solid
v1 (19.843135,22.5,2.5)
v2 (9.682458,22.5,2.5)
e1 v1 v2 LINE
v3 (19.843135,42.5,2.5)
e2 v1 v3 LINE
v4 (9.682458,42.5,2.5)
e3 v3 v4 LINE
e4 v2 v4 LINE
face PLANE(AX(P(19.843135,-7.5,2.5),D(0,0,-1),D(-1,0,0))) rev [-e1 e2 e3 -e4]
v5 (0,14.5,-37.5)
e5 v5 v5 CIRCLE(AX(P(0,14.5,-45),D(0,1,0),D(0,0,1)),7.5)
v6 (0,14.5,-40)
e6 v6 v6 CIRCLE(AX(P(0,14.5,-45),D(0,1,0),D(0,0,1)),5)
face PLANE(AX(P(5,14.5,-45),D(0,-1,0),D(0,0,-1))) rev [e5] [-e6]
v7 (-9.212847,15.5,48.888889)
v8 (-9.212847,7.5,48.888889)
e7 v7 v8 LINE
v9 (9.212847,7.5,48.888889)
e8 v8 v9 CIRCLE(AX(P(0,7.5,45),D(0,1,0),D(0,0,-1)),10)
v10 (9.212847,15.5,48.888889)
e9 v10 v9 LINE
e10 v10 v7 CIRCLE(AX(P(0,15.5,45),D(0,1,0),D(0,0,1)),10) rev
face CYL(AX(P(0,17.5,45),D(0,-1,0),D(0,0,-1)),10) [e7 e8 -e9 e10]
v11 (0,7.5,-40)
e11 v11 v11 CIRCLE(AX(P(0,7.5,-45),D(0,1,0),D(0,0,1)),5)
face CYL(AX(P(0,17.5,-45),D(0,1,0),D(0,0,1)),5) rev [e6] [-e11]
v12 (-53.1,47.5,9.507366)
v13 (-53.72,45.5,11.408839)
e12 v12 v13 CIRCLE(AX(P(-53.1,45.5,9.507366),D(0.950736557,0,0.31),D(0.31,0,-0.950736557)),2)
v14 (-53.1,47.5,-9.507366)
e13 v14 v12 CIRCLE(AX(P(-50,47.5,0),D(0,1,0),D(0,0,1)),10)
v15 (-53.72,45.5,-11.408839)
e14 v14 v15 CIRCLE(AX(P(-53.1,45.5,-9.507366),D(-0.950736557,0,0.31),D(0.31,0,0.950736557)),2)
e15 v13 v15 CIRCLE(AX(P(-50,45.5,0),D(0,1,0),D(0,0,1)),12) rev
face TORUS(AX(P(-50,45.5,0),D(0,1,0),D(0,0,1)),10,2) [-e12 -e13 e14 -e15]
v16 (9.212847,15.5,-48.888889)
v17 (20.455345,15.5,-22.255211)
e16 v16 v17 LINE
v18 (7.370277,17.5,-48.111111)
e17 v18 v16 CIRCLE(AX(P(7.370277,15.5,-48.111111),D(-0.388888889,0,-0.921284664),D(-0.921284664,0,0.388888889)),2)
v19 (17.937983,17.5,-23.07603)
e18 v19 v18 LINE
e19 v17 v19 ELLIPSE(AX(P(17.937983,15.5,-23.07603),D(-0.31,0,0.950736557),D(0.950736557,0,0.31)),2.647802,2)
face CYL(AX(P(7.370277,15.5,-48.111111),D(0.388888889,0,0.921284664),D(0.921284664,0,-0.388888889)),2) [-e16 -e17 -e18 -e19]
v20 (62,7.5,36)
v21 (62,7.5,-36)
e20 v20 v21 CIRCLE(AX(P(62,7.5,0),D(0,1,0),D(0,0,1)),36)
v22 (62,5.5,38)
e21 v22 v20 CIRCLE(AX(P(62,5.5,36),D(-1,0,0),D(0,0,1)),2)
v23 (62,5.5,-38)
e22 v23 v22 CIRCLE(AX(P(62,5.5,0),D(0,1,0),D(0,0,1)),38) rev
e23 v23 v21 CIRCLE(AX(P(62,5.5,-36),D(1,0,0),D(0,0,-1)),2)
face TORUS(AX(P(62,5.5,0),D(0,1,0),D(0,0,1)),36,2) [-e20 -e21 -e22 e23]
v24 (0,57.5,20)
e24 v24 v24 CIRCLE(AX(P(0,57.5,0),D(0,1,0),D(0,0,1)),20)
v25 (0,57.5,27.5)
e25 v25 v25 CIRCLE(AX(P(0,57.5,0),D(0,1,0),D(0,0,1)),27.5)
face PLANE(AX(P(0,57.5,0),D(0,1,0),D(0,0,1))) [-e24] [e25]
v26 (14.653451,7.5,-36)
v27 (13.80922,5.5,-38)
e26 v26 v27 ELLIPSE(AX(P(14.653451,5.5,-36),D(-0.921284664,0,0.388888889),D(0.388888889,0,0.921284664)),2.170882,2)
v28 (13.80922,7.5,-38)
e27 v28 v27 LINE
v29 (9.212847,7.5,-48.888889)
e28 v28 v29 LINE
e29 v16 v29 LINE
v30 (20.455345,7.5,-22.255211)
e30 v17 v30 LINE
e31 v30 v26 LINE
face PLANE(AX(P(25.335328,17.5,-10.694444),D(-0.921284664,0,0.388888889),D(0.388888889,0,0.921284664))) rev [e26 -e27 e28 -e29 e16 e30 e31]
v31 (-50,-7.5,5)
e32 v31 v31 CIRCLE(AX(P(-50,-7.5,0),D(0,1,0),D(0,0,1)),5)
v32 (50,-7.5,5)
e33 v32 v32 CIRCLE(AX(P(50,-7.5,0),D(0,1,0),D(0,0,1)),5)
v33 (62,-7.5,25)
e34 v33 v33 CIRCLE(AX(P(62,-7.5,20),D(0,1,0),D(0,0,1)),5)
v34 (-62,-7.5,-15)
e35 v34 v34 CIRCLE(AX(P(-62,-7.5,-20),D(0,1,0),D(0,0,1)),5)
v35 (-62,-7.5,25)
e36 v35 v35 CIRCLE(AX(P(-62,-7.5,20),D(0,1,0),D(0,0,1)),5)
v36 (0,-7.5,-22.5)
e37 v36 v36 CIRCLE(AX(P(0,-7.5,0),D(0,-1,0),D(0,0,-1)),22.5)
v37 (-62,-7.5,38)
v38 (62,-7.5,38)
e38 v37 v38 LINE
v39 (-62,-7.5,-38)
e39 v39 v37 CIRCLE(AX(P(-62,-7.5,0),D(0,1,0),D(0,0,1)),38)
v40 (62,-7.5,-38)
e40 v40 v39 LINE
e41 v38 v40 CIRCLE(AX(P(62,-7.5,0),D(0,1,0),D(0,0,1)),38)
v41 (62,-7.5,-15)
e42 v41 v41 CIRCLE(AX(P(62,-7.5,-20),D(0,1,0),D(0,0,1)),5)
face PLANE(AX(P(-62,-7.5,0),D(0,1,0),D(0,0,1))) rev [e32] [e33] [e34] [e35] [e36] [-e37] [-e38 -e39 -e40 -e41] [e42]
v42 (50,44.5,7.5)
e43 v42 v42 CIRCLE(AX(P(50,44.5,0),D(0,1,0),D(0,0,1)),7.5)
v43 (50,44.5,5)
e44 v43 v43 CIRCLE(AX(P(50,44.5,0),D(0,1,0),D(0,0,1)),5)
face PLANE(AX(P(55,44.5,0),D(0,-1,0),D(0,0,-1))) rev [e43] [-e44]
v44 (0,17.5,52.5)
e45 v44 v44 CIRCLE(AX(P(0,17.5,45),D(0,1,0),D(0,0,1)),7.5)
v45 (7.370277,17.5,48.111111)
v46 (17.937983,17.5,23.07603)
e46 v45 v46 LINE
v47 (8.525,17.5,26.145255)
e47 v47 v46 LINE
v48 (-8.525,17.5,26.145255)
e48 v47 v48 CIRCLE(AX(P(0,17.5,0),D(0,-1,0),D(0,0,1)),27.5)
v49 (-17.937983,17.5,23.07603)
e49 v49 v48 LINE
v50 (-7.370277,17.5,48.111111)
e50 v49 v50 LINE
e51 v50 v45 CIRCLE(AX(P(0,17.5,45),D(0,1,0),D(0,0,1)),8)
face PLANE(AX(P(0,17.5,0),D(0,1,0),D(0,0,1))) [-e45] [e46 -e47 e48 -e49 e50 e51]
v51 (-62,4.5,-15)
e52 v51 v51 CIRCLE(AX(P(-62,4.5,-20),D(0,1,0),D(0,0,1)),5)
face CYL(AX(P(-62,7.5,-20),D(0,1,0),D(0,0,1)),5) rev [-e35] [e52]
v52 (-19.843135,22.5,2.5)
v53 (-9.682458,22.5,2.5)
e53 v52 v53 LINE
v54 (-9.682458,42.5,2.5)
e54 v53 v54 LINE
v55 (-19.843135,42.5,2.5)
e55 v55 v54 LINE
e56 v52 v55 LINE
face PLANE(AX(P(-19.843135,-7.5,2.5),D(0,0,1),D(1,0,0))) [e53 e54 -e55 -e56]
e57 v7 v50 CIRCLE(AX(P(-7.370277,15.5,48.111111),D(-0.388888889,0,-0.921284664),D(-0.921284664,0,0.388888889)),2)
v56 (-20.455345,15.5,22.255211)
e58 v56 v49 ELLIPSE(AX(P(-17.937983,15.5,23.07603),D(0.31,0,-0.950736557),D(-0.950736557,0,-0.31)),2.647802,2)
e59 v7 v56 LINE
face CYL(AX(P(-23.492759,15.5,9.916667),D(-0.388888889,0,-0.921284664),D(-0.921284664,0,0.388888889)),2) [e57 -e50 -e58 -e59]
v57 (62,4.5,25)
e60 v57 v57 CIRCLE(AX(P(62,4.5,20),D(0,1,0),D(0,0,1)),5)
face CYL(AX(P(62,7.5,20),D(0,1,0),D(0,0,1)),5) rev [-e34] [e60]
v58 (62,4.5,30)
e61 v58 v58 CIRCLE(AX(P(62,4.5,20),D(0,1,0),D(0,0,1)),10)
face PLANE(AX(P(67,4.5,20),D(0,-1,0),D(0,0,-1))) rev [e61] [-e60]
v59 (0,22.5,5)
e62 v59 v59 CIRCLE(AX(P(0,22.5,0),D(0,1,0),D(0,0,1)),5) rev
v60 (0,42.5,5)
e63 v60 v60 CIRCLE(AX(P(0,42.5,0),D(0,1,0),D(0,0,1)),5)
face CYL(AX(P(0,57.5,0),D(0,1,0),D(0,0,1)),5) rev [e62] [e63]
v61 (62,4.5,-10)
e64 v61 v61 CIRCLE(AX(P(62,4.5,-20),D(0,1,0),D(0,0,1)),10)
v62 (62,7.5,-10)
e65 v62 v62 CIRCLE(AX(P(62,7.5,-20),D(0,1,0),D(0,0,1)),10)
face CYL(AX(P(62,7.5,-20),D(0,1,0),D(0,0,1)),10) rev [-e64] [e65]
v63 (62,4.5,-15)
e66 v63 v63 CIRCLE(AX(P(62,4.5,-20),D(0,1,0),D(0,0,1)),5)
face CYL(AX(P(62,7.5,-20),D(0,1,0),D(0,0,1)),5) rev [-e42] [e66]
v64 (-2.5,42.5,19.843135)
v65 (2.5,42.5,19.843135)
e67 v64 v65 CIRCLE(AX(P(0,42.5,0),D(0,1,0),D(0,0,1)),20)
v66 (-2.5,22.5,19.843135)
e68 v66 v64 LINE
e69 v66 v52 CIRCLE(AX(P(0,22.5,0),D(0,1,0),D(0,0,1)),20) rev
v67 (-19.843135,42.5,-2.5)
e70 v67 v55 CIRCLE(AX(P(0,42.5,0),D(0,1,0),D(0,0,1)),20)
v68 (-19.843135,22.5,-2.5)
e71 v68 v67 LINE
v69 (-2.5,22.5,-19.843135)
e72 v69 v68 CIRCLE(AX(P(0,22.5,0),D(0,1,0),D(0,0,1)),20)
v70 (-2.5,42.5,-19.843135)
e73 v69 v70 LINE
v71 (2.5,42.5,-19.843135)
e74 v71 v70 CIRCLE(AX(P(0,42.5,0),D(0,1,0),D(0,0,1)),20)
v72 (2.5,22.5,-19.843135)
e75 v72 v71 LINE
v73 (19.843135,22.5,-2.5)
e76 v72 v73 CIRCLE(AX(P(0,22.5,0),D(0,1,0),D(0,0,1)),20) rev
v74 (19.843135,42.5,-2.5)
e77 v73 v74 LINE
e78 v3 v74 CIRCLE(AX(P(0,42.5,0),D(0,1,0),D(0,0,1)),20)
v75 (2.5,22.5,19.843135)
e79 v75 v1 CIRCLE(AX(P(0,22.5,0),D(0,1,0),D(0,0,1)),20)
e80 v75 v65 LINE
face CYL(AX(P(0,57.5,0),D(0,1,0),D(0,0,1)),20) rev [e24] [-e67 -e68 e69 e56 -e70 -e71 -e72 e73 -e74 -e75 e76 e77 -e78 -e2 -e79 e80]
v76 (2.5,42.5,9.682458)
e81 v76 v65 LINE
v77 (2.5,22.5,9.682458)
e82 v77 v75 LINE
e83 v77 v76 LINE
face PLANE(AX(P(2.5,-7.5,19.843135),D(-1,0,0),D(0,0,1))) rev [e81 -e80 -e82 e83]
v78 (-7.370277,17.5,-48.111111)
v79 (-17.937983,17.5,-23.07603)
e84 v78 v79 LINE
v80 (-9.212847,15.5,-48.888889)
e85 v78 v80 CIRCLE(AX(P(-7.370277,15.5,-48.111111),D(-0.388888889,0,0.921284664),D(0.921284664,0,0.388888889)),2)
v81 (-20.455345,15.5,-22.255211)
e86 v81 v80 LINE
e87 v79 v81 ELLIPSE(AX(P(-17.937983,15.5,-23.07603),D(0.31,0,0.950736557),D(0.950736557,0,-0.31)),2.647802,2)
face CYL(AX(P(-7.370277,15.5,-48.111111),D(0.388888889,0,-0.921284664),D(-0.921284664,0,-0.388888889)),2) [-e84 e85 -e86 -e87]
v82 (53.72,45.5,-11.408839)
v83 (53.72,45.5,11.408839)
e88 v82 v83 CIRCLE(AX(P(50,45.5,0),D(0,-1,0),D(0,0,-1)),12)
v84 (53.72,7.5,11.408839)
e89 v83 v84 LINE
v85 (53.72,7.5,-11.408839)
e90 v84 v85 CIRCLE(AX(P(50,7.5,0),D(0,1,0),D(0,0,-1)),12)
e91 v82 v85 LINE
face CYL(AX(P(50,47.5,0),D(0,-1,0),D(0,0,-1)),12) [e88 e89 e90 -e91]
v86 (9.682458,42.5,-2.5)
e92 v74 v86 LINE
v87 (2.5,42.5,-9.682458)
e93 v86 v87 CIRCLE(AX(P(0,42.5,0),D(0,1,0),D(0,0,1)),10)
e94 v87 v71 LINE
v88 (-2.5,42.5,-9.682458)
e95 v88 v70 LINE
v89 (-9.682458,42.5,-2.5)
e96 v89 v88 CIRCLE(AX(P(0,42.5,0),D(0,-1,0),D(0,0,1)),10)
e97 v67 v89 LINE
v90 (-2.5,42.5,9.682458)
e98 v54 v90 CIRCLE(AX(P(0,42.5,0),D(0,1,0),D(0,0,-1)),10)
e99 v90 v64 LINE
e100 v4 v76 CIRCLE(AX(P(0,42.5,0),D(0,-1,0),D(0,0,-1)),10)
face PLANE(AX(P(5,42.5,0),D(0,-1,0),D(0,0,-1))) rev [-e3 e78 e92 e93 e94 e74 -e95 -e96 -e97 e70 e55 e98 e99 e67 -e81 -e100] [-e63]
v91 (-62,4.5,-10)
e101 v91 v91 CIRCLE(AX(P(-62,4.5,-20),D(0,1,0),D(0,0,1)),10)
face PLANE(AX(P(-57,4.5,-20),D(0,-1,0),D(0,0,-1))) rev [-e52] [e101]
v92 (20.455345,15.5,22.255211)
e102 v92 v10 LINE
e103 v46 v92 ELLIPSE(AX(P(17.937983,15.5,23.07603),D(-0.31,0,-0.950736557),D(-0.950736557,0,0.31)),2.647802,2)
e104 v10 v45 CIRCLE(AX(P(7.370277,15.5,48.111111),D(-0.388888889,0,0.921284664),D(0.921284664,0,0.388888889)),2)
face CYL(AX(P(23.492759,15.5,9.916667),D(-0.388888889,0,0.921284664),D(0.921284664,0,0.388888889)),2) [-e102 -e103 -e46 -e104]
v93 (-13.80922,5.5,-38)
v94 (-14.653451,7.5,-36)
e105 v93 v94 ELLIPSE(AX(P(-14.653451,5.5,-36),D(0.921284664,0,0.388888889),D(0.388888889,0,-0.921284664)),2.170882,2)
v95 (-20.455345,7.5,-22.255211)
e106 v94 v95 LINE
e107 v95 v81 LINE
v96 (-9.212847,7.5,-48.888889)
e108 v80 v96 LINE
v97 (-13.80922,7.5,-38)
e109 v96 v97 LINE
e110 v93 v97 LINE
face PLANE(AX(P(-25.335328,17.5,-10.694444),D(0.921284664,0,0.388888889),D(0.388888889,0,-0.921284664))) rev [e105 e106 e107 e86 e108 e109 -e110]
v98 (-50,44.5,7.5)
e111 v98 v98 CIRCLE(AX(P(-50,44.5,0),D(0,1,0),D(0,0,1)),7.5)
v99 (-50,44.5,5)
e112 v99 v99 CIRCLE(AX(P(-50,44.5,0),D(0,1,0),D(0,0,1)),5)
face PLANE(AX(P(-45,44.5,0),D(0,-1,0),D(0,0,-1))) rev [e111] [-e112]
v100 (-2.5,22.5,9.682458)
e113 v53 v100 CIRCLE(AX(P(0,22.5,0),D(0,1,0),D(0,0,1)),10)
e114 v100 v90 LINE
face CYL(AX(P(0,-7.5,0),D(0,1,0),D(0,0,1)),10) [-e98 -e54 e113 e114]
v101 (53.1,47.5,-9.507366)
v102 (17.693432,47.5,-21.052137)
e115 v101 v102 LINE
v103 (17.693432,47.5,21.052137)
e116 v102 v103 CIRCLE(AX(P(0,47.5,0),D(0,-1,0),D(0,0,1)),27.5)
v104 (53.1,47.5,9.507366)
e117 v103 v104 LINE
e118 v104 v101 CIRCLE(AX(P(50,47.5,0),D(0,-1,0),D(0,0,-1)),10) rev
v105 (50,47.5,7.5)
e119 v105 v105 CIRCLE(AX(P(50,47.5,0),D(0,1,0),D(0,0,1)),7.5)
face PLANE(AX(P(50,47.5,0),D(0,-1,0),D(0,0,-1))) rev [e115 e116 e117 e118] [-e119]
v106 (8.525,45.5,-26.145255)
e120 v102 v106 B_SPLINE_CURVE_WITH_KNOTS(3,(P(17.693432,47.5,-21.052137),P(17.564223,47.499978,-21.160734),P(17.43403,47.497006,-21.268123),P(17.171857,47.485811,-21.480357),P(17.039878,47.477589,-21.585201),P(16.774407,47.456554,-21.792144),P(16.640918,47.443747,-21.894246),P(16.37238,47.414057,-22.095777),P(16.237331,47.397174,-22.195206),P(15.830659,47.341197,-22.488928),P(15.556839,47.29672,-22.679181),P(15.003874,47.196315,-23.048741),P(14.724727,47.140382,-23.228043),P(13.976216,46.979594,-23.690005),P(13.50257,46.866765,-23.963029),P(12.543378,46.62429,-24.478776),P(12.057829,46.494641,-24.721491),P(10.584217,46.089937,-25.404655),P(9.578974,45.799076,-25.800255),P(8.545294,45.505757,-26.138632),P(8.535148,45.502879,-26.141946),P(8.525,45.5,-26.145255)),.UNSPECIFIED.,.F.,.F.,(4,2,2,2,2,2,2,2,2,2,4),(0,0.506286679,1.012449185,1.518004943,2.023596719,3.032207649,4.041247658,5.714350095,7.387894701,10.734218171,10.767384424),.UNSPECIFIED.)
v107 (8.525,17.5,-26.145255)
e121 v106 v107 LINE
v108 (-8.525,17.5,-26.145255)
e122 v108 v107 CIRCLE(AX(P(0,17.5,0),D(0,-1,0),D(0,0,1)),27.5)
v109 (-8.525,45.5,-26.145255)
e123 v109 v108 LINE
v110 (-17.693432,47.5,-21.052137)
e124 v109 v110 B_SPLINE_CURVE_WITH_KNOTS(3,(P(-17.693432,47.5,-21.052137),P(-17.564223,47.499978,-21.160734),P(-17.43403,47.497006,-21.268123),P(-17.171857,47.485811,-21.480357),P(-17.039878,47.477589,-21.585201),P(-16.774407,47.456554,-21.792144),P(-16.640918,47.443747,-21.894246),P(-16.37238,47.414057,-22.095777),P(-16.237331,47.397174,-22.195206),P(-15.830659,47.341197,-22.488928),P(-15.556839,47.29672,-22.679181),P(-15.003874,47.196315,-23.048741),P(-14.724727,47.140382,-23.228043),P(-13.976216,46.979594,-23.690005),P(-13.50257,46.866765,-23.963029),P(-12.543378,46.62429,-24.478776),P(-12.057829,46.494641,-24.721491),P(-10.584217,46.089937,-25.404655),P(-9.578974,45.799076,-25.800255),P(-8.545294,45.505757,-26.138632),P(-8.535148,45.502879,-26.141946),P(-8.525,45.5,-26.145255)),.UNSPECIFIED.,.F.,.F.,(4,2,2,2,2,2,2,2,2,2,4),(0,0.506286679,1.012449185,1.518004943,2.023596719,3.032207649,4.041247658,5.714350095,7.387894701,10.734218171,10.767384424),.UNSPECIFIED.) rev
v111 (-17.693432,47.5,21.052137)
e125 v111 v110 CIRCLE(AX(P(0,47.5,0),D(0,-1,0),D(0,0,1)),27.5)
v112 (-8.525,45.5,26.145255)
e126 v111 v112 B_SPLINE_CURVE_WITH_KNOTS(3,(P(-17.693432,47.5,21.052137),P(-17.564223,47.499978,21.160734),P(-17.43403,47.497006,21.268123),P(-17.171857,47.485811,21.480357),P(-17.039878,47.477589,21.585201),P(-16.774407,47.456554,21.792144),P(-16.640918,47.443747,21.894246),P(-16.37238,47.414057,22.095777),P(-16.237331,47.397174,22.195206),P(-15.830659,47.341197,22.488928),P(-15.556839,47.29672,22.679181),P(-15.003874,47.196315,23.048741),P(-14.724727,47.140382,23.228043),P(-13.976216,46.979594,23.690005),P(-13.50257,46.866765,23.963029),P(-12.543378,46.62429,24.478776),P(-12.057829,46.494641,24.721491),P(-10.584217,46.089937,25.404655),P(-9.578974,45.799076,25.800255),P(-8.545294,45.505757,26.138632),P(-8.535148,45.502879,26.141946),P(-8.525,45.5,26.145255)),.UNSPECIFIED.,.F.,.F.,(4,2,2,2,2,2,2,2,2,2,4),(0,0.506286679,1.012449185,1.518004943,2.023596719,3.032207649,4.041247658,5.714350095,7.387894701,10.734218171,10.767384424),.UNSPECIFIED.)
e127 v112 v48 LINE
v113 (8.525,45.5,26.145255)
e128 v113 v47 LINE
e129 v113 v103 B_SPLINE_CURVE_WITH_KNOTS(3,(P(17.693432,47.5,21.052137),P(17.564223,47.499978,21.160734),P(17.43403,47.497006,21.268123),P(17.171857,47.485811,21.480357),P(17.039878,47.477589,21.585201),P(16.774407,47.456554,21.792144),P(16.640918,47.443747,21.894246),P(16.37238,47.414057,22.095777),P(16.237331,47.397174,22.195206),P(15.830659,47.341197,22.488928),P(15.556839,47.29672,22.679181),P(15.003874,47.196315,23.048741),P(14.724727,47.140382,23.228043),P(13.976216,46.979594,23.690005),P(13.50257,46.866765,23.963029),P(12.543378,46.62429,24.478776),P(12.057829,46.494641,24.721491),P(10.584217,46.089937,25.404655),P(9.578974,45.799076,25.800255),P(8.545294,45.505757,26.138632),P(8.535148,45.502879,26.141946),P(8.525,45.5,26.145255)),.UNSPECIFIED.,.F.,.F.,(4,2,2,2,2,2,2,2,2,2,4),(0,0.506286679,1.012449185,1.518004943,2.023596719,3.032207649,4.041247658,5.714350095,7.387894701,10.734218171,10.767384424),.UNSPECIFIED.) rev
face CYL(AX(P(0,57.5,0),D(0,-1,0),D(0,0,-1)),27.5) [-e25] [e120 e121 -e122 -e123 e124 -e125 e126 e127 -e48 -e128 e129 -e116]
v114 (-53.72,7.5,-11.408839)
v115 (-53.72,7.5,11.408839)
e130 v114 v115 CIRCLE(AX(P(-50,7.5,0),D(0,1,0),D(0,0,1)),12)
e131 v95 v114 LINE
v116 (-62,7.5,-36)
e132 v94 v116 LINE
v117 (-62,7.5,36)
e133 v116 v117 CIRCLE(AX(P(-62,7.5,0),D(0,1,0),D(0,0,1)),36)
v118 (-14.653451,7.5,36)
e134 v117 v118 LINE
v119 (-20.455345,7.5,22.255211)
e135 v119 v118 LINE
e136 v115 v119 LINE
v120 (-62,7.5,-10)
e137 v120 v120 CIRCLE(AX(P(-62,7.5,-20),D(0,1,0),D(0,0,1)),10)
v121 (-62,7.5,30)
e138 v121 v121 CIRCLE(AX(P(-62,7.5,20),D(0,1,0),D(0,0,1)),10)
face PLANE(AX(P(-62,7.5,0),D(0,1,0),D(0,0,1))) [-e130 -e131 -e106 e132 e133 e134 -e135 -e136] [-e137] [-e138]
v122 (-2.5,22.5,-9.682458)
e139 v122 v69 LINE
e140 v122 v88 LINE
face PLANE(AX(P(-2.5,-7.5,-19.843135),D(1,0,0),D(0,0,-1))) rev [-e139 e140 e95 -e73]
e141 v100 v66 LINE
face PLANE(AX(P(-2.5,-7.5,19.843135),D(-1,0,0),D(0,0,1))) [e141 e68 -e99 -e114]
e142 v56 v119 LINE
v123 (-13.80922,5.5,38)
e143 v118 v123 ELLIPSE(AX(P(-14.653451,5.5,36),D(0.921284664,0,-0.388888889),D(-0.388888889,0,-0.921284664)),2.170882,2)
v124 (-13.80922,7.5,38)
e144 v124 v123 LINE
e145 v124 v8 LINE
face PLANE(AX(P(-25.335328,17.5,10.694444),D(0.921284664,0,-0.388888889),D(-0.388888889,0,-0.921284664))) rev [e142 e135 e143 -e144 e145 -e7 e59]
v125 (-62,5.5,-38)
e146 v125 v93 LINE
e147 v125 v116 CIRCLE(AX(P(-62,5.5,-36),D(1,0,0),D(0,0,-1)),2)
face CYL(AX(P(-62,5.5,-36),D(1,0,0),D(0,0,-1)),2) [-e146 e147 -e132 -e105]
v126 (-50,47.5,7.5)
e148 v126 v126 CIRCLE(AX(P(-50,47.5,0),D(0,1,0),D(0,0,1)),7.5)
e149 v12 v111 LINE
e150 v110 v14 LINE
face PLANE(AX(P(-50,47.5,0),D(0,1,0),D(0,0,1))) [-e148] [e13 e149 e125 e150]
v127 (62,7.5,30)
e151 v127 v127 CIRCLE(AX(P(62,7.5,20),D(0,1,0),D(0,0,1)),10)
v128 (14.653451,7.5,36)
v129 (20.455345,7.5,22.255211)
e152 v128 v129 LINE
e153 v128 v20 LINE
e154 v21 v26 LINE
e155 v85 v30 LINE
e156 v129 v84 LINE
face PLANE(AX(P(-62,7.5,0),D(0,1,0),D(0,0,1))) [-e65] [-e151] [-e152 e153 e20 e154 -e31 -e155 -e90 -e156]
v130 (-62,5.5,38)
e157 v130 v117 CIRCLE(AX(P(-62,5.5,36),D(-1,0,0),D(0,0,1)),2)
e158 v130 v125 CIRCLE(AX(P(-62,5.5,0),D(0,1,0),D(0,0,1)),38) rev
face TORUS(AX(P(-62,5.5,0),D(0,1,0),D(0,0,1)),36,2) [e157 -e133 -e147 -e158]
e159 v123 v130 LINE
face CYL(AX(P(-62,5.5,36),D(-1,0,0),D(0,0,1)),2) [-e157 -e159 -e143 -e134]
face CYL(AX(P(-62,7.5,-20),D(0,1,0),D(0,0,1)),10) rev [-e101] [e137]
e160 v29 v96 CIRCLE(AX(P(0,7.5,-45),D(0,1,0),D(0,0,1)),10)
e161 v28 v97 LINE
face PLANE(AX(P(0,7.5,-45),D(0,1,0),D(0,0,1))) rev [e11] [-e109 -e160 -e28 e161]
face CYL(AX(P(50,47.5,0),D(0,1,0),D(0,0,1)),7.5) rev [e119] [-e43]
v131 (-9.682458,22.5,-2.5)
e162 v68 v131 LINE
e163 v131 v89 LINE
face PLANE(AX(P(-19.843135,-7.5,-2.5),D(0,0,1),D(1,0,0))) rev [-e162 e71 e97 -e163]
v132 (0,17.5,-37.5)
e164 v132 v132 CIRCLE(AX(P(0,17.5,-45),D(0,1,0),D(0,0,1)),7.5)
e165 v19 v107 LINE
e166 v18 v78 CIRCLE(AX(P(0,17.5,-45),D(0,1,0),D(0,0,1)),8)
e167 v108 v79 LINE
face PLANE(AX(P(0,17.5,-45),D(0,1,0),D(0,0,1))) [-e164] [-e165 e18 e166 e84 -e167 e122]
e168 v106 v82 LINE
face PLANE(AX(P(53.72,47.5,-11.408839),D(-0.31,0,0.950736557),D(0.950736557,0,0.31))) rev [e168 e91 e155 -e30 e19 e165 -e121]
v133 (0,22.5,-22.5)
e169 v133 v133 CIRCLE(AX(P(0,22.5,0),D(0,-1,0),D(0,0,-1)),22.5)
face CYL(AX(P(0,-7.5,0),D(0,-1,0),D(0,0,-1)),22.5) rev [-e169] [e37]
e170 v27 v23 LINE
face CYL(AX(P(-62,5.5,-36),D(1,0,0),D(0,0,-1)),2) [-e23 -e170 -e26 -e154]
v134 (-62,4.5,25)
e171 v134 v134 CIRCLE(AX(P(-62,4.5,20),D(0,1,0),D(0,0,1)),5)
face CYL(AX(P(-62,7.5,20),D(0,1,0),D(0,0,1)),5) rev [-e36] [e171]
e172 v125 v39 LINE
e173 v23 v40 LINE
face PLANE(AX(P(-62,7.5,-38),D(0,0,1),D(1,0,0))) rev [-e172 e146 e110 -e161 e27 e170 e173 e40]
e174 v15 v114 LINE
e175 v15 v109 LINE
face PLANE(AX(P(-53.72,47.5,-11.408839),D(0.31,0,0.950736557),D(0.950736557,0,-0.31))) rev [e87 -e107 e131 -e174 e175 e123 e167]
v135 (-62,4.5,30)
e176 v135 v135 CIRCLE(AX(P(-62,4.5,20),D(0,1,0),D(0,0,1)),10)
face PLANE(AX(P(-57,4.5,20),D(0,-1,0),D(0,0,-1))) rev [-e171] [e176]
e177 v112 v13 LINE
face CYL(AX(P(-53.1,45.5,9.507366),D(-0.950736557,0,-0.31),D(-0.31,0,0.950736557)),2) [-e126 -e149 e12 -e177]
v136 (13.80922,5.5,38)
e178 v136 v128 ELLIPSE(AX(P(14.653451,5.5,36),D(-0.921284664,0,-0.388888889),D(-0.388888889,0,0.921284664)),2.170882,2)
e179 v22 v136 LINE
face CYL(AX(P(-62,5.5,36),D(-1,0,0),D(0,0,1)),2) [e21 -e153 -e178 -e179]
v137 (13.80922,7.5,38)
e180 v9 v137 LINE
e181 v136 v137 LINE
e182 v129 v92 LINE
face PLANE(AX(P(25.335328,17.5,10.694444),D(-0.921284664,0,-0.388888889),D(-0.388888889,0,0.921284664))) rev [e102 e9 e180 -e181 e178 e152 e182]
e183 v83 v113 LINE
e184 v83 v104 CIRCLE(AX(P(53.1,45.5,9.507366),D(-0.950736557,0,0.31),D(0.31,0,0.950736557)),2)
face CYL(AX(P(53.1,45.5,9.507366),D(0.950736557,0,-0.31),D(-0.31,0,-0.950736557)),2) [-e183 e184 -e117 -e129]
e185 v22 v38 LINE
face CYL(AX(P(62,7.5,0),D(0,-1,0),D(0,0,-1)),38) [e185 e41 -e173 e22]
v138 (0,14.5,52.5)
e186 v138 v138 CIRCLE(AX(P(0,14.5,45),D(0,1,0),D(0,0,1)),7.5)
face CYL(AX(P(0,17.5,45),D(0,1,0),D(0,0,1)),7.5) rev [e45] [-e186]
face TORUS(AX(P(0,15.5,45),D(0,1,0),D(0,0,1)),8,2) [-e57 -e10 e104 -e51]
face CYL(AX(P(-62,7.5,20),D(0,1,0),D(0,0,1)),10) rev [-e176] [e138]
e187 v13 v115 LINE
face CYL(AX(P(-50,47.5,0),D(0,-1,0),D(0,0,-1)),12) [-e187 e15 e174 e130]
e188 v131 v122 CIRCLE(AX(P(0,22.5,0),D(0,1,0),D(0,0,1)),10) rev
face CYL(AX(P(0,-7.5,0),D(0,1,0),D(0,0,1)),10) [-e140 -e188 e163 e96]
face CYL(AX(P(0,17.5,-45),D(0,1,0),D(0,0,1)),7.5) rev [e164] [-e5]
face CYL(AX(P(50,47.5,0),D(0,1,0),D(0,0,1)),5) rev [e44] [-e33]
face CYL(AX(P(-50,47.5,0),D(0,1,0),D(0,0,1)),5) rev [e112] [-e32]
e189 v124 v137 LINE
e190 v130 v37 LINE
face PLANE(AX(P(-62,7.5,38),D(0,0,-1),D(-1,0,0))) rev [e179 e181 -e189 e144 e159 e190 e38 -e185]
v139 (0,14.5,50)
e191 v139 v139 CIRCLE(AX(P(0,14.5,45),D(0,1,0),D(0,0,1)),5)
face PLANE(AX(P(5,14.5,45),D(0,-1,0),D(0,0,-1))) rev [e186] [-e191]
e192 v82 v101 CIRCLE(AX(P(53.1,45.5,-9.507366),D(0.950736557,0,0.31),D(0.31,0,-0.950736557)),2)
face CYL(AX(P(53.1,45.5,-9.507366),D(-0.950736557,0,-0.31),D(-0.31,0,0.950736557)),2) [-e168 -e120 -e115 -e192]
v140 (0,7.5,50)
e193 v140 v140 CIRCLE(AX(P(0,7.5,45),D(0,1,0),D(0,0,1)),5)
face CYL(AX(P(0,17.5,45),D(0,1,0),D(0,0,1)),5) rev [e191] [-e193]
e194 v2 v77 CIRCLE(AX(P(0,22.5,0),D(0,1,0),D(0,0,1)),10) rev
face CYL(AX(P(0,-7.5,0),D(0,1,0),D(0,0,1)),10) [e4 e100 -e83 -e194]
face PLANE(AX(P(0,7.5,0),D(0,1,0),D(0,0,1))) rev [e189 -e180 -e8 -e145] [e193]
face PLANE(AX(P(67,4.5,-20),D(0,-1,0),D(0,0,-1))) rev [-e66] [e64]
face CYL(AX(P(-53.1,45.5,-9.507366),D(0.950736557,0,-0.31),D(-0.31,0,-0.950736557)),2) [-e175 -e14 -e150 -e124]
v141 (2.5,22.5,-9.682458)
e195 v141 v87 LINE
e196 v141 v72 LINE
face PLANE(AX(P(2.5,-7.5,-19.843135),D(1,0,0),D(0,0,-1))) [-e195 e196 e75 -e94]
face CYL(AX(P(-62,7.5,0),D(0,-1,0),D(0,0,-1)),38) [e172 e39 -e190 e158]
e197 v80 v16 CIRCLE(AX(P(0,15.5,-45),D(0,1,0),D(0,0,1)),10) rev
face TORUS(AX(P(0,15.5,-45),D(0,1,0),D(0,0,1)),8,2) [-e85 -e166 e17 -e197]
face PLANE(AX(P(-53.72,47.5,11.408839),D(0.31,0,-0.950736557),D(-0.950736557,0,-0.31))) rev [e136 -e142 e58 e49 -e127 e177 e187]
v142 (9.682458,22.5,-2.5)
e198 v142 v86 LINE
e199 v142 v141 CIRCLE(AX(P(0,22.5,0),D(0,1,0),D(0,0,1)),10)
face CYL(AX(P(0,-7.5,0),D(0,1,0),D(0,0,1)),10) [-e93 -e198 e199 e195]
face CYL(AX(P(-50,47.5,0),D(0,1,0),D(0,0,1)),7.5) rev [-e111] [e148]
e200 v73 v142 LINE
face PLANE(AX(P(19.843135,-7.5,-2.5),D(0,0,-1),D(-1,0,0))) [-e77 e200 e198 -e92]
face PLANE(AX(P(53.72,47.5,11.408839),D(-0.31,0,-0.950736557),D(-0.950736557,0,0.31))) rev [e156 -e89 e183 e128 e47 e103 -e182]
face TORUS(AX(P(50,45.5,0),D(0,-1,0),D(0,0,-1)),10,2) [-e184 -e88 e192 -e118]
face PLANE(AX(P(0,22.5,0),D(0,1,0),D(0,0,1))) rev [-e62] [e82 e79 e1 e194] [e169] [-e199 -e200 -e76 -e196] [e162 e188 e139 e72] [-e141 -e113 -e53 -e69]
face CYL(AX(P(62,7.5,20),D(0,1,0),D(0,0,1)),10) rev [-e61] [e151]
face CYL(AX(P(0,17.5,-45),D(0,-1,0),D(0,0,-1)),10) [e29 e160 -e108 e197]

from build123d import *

# Parameters (mm, degrees)
BOSS_EXTRUDE1_DEPTH  = 7.5
SKETCH2_R            = 27.5
BOSS_EXTRUDE2_DEPTH  = 50
HOLE2_D              = 10
HOLE2_DEPTH          = 65
HOLE2_CBORE_D        = 40
HOLE2_CBORE_DEPTH    = 15
HOLE2_TIP            = 3.004303095
BOSS_EXTRUDE3_DEPTH  = 40
HOLE3_D              = 10
HOLE3_DEPTH          = 55
HOLE3_CBORE_D        = 15
HOLE3_CBORE_DEPTH    = 3
HOLE3_TIP            = 3.004303095
BOSS_EXTRUDE4_DEPTH  = 10
HOLE4_D              = 10
HOLE4_DEPTH          = 25
HOLE4_CBORE_D        = 15
HOLE4_CBORE_DEPTH    = 3
HOLE4_TIP            = 3.004303095
HOLE5_D              = 45
HOLE5_DEPTH          = 30
CUT_EXTRUDE1_DEPTH   = 125.599357944
MIRROR4_COPY_1_DEPTH = 125.599357944
FILLET1_R            = 2


with BuildPart() as part:
    # Sketch1 → Boss-Extrude1 (new, symmetric)
    with BuildSketch(Plane(origin=(0, 0, 0), x_dir=(1, 0, 0), z_dir=(0, 1, 0))):
        with BuildLine():
            Line((-62, 38), (62, 38))
            ThreePointArc((62, 38), (100, 0), (62, -38))
            Line((62, -38), (-62, -38))
            ThreePointArc((-62, -38), (-100, 0), (-62, 38))
        make_face()
    extrude(amount=BOSS_EXTRUDE1_DEPTH, both=True)

    # Sketch2 → Boss-Extrude2 (add)
    with BuildSketch(Plane(origin=(0, 7.5, 0), x_dir=(1, 0, 0), z_dir=(0, 1, 0))):
        with Locations(Location((0, 0, 0), (0, 0, 270))):
            Circle(SKETCH2_R)
    extrude(amount=BOSS_EXTRUDE2_DEPTH)

    # Sketch4 → Hole1 (revolve, cut)
    with BuildSketch(Plane(origin=(62, 7.5, -20), x_dir=(0, 0, 1), z_dir=(1, 0, 0))):
        Polygon((0, 0), (0, 18.004303095), (5, 15), (5, 3), (10, 3), (10, 0), align=None)
    hole1 = revolve(axis=Axis((62, 18.810875039, -20), (0, -1, 0)), mode=Mode.SUBTRACT)

    # Mirror1: Hole1 across plane
    add(hole1.mirror(Plane.XY), mode=Mode.SUBTRACT)

    # Mirror2: Hole1 across plane
    add(hole1.mirror(Plane(origin=(0, 0, 0), x_dir=(0, 0, 1), z_dir=(1, 0, 0))), mode=Mode.SUBTRACT)

    # Mirror2 copy 1 sketch → Mirror2 copy 1 (revolve, cut)
    with BuildSketch(Plane(origin=(-62, 7.5, 20), x_dir=(0, 0, -1), z_dir=(-1, 0, 0))):
        Polygon((0, 0), (0, 18.004303095), (5, 15), (5, 3), (10, 3), (10, 0), align=None)
    revolve(axis=Axis((-62, 18.810875039, 20), (0, -1, 0)), mode=Mode.SUBTRACT)

    # Hole2
    with Locations(Plane(origin=(0, 57.5, 0), x_dir=(1, 0, 0), z_dir=(0, 1, 0))):
        with Locations((0, 0)):
            CounterBoreHole(HOLE2_D / 2, HOLE2_CBORE_D / 2, HOLE2_CBORE_DEPTH, depth=HOLE2_DEPTH)
            with Locations((0, 0, -(HOLE2_DEPTH + HOLE2_TIP / 2))):  # 118° drill point
                Cone(0, HOLE2_D / 2, HOLE2_TIP, mode=Mode.SUBTRACT)

    # Sketch7 → Boss-Extrude3 (add)
    with BuildSketch(Plane(origin=(0, 7.5, 0), x_dir=(1, 0, 0), z_dir=(0, 1, 0))):
        with BuildLine():
            Line((-53.72, 11.408838679), (-8.525, 26.145255306))
            ThreePointArc((-8.525, 26.145255306), (-27.5, 0), (-8.525, -26.145255306))
            Line((-8.525, -26.145255306), (-53.72, -11.408838679))
            ThreePointArc((-53.72, -11.408838679), (-62, 0), (-53.72, 11.408838679))
        make_face()
        with BuildLine():
            Line((53.72, 11.408838679), (8.525, 26.145255306))
            ThreePointArc((8.525, 26.145255306), (27.5, 0), (8.525, -26.145255306))
            Line((8.525, -26.145255306), (53.72, -11.408838679))
            ThreePointArc((53.72, -11.408838679), (62, 0), (53.72, 11.408838679))
        make_face()
    extrude(amount=BOSS_EXTRUDE3_DEPTH)

    # Hole3
    with Locations(Plane(origin=(0, 47.5, 0), x_dir=(1, 0, 0), z_dir=(0, 1, 0))):
        with Locations((50, 0), (-50, 0)):
            CounterBoreHole(HOLE3_D / 2, HOLE3_CBORE_D / 2, HOLE3_CBORE_DEPTH, depth=HOLE3_DEPTH)
            with Locations((0, 0, -(HOLE3_DEPTH + HOLE3_TIP / 2))):  # 118° drill point
                Cone(0, HOLE3_D / 2, HOLE3_TIP, mode=Mode.SUBTRACT)

    # Sketch10 → Boss-Extrude4 (add)
    with BuildSketch(Plane(origin=(0, 7.5, 0), x_dir=(1, 0, 0), z_dir=(0, 1, 0))):
        with BuildLine():
            Line((-25.33532826, 10.694444444), (-9.21284664, 48.888888889))
            ThreePointArc((-9.21284664, 48.888888889), (0, 55), (9.21284664, 48.888888889))
            Line((9.21284664, 48.888888889), (25.33532826, 10.694444444))
            ThreePointArc((25.33532826, 10.694444444), (0, 27.5), (-25.33532826, 10.694444444))
        make_face()
        with BuildLine():
            Line((-25.33532826, -10.694444444), (-9.21284664, -48.888888889))
            ThreePointArc((-9.21284664, -48.888888889), (0, -55), (9.21284664, -48.888888889))
            Line((9.21284664, -48.888888889), (25.33532826, -10.694444444))
            ThreePointArc((25.33532826, -10.694444444), (0, -27.5), (-25.33532826, -10.694444444))
        make_face()
    extrude(amount=BOSS_EXTRUDE4_DEPTH)

    # Hole4
    with Locations(Plane(origin=(0, 17.5, 0), x_dir=(1, 0, 0), z_dir=(0, 1, 0))):
        with Locations((0, -45), (0, 45)):
            CounterBoreHole(HOLE4_D / 2, HOLE4_CBORE_D / 2, HOLE4_CBORE_DEPTH, depth=HOLE4_DEPTH)
            with Locations((0, 0, -(HOLE4_DEPTH + HOLE4_TIP / 2))):  # 118° drill point
                Cone(0, HOLE4_D / 2, HOLE4_TIP, mode=Mode.SUBTRACT)

    # Hole5
    with Locations(Plane(origin=(0, -7.5, 0), x_dir=(-1, 0, 0), z_dir=(0, -1, 0))):
        with Locations((0, 0)):
            Hole(HOLE5_D / 2, depth=HOLE5_DEPTH)

    # Sketch16 → Cut-Extrude1 (cut, through all)
    with BuildSketch(Plane(origin=(0, 42.5, 0), x_dir=(1, 0, 0), z_dir=(0, 1, 0))):
        with BuildLine():
            Line((-2.5, 19.843134833), (-2.5, 9.682458366))
            ThreePointArc((-2.5, 9.682458366), (-7.071067812, 7.071067812), (-9.682458366, 2.5))
            Line((-9.682458366, 2.5), (-19.843134833, 2.5))
            ThreePointArc((-19.843134833, 2.5), (-14.142135624, 14.142135624), (-2.5, 19.843134833))
        make_face()
    cut_extrude1 = extrude(amount=-CUT_EXTRUDE1_DEPTH, mode=Mode.SUBTRACT)

    # Mirror3: Cut-Extrude1 across plane
    add(cut_extrude1.mirror(Plane(origin=(0, 0, 0), x_dir=(0, 0, 1), z_dir=(1, 0, 0))), mode=Mode.SUBTRACT)

    # Mirror4: Cut-Extrude1 across plane
    add(cut_extrude1.mirror(Plane.XY), mode=Mode.SUBTRACT)

    # Mirror4 copy 1 sketch → Mirror4 copy 1 (cut, through all)
    with BuildSketch(Plane(origin=(0, 42.5, 0), x_dir=(-1, 0, 0), z_dir=(0, 1, 0))):
        with BuildLine():
            Line((-2.5, 19.843134833), (-2.5, 9.682458366))
            ThreePointArc((-2.5, 9.682458366), (-7.071067812, 7.071067812), (-9.682458366, 2.5))
            Line((-9.682458366, 2.5), (-19.843134833, 2.5))
            ThreePointArc((-19.843134833, 2.5), (-14.142135624, 14.142135624), (-2.5, 19.843134833))
        make_face()
    extrude(amount=-MIRROR4_COPY_1_DEPTH, mode=Mode.SUBTRACT)

    # Fillet1
    # the kernel refuses this fillet: 2 mm, written as the material it takes off along each edge
    with BuildSketch(Plane(origin=(-62, 7.5, -38), x_dir=(0, 0, 1), z_dir=(1, 0, 0))) as fillet1_piece_1_section:
        with BuildLine():
            CenterArc((FILLET1_R, FILLET1_R), FILLET1_R, 180, 90)
            Line((0, FILLET1_R), (0, 0))
            Line((0, 0), (FILLET1_R, 0))
        make_face()
    fillet1_piece_1 = extrude(amount=53.190780418, mode=Mode.PRIVATE)
    fillet1_piece_1 = split(fillet1_piece_1, bisect_by=Plane(origin=(-20.833780662, 7.164754095, -21.358690415), z_dir=(-0.9212846639876113, 0, -0.3888888888888888)), keep=Keep.TOP, mode=Mode.PRIVATE)
    add(fillet1_piece_1, mode=Mode.SUBTRACT)
    with BuildSketch(Plane(origin=(62, 7.5, 38), x_dir=(0, -1, 0), z_dir=(-1, 0, 0))) as fillet1_piece_2_section:
        with BuildLine():
            CenterArc((FILLET1_R, -FILLET1_R), FILLET1_R, 90, 90)
            Line((0, -FILLET1_R), (0, 0))
            Line((0, 0), (FILLET1_R, 0))
        make_face()
    fillet1_piece_2 = extrude(amount=53.190780418, mode=Mode.PRIVATE)
    fillet1_piece_2 = split(fillet1_piece_2, bisect_by=Plane(origin=(17.234551634, 7.038799098, 29.885327715), z_dir=(0.9212846639876113, 0, 0.3888888888888888)), keep=Keep.TOP, mode=Mode.PRIVATE)
    add(fillet1_piece_2, mode=Mode.SUBTRACT)
    with BuildSketch(Plane(origin=(9.21284664, 17.5, -48.888888889), x_dir=(0, -1, 0), z_dir=(0.38888888888888873, 0, 0.9212846639876112))) as fillet1_piece_3_section:
        with BuildLine():
            CenterArc((FILLET1_R, -FILLET1_R), FILLET1_R, 90, 90)
            Line((0, -FILLET1_R), (0, 0))
            Line((0, 0), (FILLET1_R, 0))
        make_face()
    fillet1_piece_3 = extrude(amount=33.909281247, mode=Mode.PRIVATE)
    fillet1_piece_3 = split(fillet1_piece_3, bisect_by=Plane(origin=(11.833338514, 17.039199737, -25.066528573), z_dir=(0.31000000000000016, 0, -0.9507365565707464)), keep=Keep.TOP, mode=Mode.PRIVATE)
    add(fillet1_piece_3, mode=Mode.SUBTRACT)
    with BuildSketch(Plane(origin=(0, 17.5, -45), x_dir=(-0.9212846639876112, 0, -0.38888888888888873), z_dir=(-0.38888888888888873, 0, 0.9212846639876112))) as fillet1_piece_4:
        with BuildLine():
            CenterArc((10 - FILLET1_R, FILLET1_R), FILLET1_R, 270, 90)
            Line((10, FILLET1_R), (10, 0))
            Line((10, 0), (10 - FILLET1_R, 0))
        make_face()
    revolve(axis=Axis((0, 17.5, -45), (0, -1, 0)), revolution_arc=134.229239048, mode=Mode.SUBTRACT)
    with BuildSketch(Plane(origin=(-22.399789347, 17.5, -17.64878811), x_dir=(0, -1, 0), z_dir=(0.38888888888888873, 0, -0.9212846639876112))) as fillet1_piece_5_section:
        with BuildLine():
            CenterArc((FILLET1_R, -FILLET1_R), FILLET1_R, 90, 90)
            Line((0, -FILLET1_R), (0, 0))
            Line((0, 0), (FILLET1_R, 0))
        make_face()
    fillet1_piece_5 = extrude(amount=33.909281247, mode=Mode.PRIVATE)
    fillet1_piece_5 = split(fillet1_piece_5, bisect_by=Plane(origin=(-11.83332722, 17.039199529, -25.066532256), z_dir=(-0.31000000000000016, 0, -0.9507365565707464)), keep=Keep.TOP, mode=Mode.PRIVATE)
    add(fillet1_piece_5, mode=Mode.SUBTRACT)
    with BuildSketch(Plane(origin=(62, 7.5, 0), x_dir=(0, 0, -1), z_dir=(-1, 0, 0))) as fillet1_piece_6:
        with BuildLine():
            CenterArc((38 - FILLET1_R, FILLET1_R), FILLET1_R, 270, 90)
            Line((38 - FILLET1_R, 0), (38, 0))
            Line((38, 0), (38, FILLET1_R))
        make_face()
    revolve(axis=Axis((62, 7.5, 0), (0, -1, 0)), revolution_arc=180, mode=Mode.SUBTRACT)
    with BuildSketch(Plane(origin=(-22.399789347, 17.5, 17.64878811), x_dir=(0, -1, 0), z_dir=(0.38888888888888873, 0, 0.9212846639876112))) as fillet1_piece_7_section:
        with BuildLine():
            CenterArc((FILLET1_R, FILLET1_R), FILLET1_R, 180, 90)
            Line((0, FILLET1_R), (0, 0))
            Line((0, 0), (FILLET1_R, 0))
        make_face()
    fillet1_piece_7 = extrude(amount=33.909281247, mode=Mode.PRIVATE)
    fillet1_piece_7 = split(fillet1_piece_7, bisect_by=Plane(origin=(-11.833330705, 17.039199751, 25.066531119), z_dir=(-0.31000000000000016, 0, 0.9507365565707464)), keep=Keep.TOP, mode=Mode.PRIVATE)
    add(fillet1_piece_7, mode=Mode.SUBTRACT)
    with BuildSketch(Plane(origin=(0, 17.5, 45), x_dir=(-0.9212846639876112, 0, 0.38888888888888873), z_dir=(-0.38888888888888873, 0, -0.9212846639876112))) as fillet1_piece_8:
        with BuildLine():
            CenterArc((10 - FILLET1_R, -FILLET1_R), FILLET1_R, 0, 90)
            Line((10 - FILLET1_R, 0), (10, 0))
            Line((10, 0), (10, -FILLET1_R))
        make_face()
    revolve(axis=Axis((0, 17.5, 45), (0, 1, 0)), revolution_arc=134.229239048, mode=Mode.SUBTRACT)
    with BuildSketch(Plane(origin=(9.21284664, 17.5, 48.888888889), x_dir=(0, -1, 0), z_dir=(0.38888888888888873, 0, -0.9212846639876112))) as fillet1_piece_9_section:
        with BuildLine():
            CenterArc((FILLET1_R, FILLET1_R), FILLET1_R, 180, 90)
            Line((0, FILLET1_R), (0, 0))
            Line((0, 0), (FILLET1_R, 0))
        make_face()
    fillet1_piece_9 = extrude(amount=33.909281247, mode=Mode.PRIVATE)
    fillet1_piece_9 = split(fillet1_piece_9, bisect_by=Plane(origin=(11.833338514, 17.039199737, 25.066528573), z_dir=(0.31000000000000016, 0, 0.9507365565707464)), keep=Keep.TOP, mode=Mode.PRIVATE)
    add(fillet1_piece_9, mode=Mode.SUBTRACT)
    with BuildSketch(Plane(origin=(8.809219582, 7.5, -38), x_dir=(0, 0, 1), z_dir=(1, 0, 0))) as fillet1_piece_10_section:
        with BuildLine():
            CenterArc((FILLET1_R, FILLET1_R), FILLET1_R, 180, 90)
            Line((0, FILLET1_R), (0, 0))
            Line((0, 0), (FILLET1_R, 0))
        make_face()
    fillet1_piece_10 = extrude(amount=53.190780418, mode=Mode.PRIVATE)
    fillet1_piece_10 = split(fillet1_piece_10, bisect_by=Plane(origin=(17.234551178, 7.038799181, -29.885328793), z_dir=(0.9212846639876113, 0, -0.3888888888888888)), keep=Keep.TOP, mode=Mode.PRIVATE)
    add(fillet1_piece_10, mode=Mode.SUBTRACT)
    with BuildSketch(Plane(origin=(-62, 7.5, 0), x_dir=(0, 0, 1), z_dir=(1, 0, 0))) as fillet1_piece_11:
        with BuildLine():
            CenterArc((38 - FILLET1_R, FILLET1_R), FILLET1_R, 270, 90)
            Line((38 - FILLET1_R, 0), (38, 0))
            Line((38, 0), (38, FILLET1_R))
        make_face()
    revolve(axis=Axis((-62, 7.5, 0), (0, -1, 0)), revolution_arc=180, mode=Mode.SUBTRACT)
    with BuildSketch(Plane(origin=(-50, 47.5, 0), x_dir=(-0.3100000000000001, 0, 0.9507365565707464), z_dir=(0.9507365565707464, 0, 0.3100000000000001))) as fillet1_piece_12:
        with BuildLine():
            CenterArc((12 - FILLET1_R, FILLET1_R), FILLET1_R, 270, 90)
            Line((12 - FILLET1_R, 0), (12, 0))
            Line((12, 0), (12, FILLET1_R))
        make_face()
    revolve(axis=Axis((-50, 47.5, 0), (0, -1, 0)), revolution_arc=143.881539018, mode=Mode.SUBTRACT)
    with BuildSketch(Plane(origin=(-3.771317217, 47.5, 27.695255306), x_dir=(0, -1, 0), z_dir=(-0.9507365565707464, 0, -0.31000000000000016))) as fillet1_piece_13_section:
        with BuildLine():
            CenterArc((FILLET1_R, -FILLET1_R), FILLET1_R, 90, 90)
            Line((0, -FILLET1_R), (0, 0))
            Line((0, 0), (FILLET1_R, 0))
        make_face()
    fillet1_piece_13 = extrude(amount=52.536827829, mode=Mode.PRIVATE)
    fillet1_piece_13 = fillet1_piece_13 - Plane(origin=(0, 47.03293557, 0), x_dir=(0, 0, 1), z_dir=(0, -1, 0)) * Cylinder(27.5, 114, mode=Mode.PRIVATE)
    add(fillet1_piece_13, mode=Mode.SUBTRACT)
    with BuildSketch(Plane(origin=(-53.72, 47.5, -11.408838679), x_dir=(0, -1, 0), z_dir=(0.9507365565707464, 0, -0.31000000000000016))) as fillet1_piece_14_section:
        with BuildLine():
            CenterArc((FILLET1_R, -FILLET1_R), FILLET1_R, 90, 90)
            Line((0, -FILLET1_R), (0, 0))
            Line((0, 0), (FILLET1_R, 0))
        make_face()
    fillet1_piece_14 = extrude(amount=52.536827829, mode=Mode.PRIVATE)
    fillet1_piece_14 = fillet1_piece_14 - Plane(origin=(0, 47.032952041, 0), x_dir=(0, 0, 1), z_dir=(0, -1, 0)) * Cylinder(27.5, 114, mode=Mode.PRIVATE)
    add(fillet1_piece_14, mode=Mode.SUBTRACT)
    with BuildSketch(Plane(origin=(50, 47.5, 0), x_dir=(0.3100000000000006, 0, 0.9507365565707462), z_dir=(-0.9507365565707462, 0, 0.3100000000000006))) as fillet1_piece_15:
        with BuildLine():
            CenterArc((12 - FILLET1_R, -FILLET1_R), FILLET1_R, 0, 90)
            Line((12 - FILLET1_R, 0), (12, 0))
            Line((12, 0), (12, -FILLET1_R))
        make_face()
    revolve(axis=Axis((50, 47.5, 0), (0, 1, 0)), revolution_arc=143.881539018, mode=Mode.SUBTRACT)
    with BuildSketch(Plane(origin=(53.72, 47.5, -11.408838679), x_dir=(0, -1, 0), z_dir=(-0.9507365565707464, 0, -0.31000000000000016))) as fillet1_piece_16_section:
        with BuildLine():
            CenterArc((FILLET1_R, FILLET1_R), FILLET1_R, 180, 90)
            Line((0, FILLET1_R), (0, 0))
            Line((0, 0), (FILLET1_R, 0))
        make_face()
    fillet1_piece_16 = extrude(amount=52.536827829, mode=Mode.PRIVATE)
    fillet1_piece_16 = fillet1_piece_16 - Plane(origin=(0, 47.032935729, 0), x_dir=(0, 0, 1), z_dir=(0, -1, 0)) * Cylinder(27.5, 114, mode=Mode.PRIVATE)
    add(fillet1_piece_16, mode=Mode.SUBTRACT)
    with BuildSketch(Plane(origin=(3.771317217, 47.5, 27.695255306), x_dir=(0, -1, 0), z_dir=(0.9507365565707464, 0, -0.31000000000000016))) as fillet1_piece_17_section:
        with BuildLine():
            CenterArc((FILLET1_R, FILLET1_R), FILLET1_R, 180, 90)
            Line((0, FILLET1_R), (0, 0))
            Line((0, 0), (FILLET1_R, 0))
        make_face()
    fillet1_piece_17 = extrude(amount=52.536827829, mode=Mode.PRIVATE)
    fillet1_piece_17 = fillet1_piece_17 - Plane(origin=(0, 47.03293558, 0), x_dir=(0, 0, 1), z_dir=(0, -1, 0)) * Cylinder(27.5, 114, mode=Mode.PRIVATE)
    add(fillet1_piece_17, mode=Mode.SUBTRACT)
    with BuildSketch(Plane(origin=(-8.809219582, 7.5, 38), x_dir=(0, -1, 0), z_dir=(-1, 0, 0))) as fillet1_piece_18_section:
        with BuildLine():
            CenterArc((FILLET1_R, -FILLET1_R), FILLET1_R, 90, 90)
            Line((0, -FILLET1_R), (0, 0))
            Line((0, 0), (FILLET1_R, 0))
        make_face()
    fillet1_piece_18 = extrude(amount=53.190780418, mode=Mode.PRIVATE)
    fillet1_piece_18 = split(fillet1_piece_18, bisect_by=Plane(origin=(-17.234549683, 7.038799175, 29.885332337), z_dir=(-0.9212846639876113, 0, 0.3888888888888888)), keep=Keep.TOP, mode=Mode.PRIVATE)
    add(fillet1_piece_18, mode=Mode.SUBTRACT)


solid = part.part
